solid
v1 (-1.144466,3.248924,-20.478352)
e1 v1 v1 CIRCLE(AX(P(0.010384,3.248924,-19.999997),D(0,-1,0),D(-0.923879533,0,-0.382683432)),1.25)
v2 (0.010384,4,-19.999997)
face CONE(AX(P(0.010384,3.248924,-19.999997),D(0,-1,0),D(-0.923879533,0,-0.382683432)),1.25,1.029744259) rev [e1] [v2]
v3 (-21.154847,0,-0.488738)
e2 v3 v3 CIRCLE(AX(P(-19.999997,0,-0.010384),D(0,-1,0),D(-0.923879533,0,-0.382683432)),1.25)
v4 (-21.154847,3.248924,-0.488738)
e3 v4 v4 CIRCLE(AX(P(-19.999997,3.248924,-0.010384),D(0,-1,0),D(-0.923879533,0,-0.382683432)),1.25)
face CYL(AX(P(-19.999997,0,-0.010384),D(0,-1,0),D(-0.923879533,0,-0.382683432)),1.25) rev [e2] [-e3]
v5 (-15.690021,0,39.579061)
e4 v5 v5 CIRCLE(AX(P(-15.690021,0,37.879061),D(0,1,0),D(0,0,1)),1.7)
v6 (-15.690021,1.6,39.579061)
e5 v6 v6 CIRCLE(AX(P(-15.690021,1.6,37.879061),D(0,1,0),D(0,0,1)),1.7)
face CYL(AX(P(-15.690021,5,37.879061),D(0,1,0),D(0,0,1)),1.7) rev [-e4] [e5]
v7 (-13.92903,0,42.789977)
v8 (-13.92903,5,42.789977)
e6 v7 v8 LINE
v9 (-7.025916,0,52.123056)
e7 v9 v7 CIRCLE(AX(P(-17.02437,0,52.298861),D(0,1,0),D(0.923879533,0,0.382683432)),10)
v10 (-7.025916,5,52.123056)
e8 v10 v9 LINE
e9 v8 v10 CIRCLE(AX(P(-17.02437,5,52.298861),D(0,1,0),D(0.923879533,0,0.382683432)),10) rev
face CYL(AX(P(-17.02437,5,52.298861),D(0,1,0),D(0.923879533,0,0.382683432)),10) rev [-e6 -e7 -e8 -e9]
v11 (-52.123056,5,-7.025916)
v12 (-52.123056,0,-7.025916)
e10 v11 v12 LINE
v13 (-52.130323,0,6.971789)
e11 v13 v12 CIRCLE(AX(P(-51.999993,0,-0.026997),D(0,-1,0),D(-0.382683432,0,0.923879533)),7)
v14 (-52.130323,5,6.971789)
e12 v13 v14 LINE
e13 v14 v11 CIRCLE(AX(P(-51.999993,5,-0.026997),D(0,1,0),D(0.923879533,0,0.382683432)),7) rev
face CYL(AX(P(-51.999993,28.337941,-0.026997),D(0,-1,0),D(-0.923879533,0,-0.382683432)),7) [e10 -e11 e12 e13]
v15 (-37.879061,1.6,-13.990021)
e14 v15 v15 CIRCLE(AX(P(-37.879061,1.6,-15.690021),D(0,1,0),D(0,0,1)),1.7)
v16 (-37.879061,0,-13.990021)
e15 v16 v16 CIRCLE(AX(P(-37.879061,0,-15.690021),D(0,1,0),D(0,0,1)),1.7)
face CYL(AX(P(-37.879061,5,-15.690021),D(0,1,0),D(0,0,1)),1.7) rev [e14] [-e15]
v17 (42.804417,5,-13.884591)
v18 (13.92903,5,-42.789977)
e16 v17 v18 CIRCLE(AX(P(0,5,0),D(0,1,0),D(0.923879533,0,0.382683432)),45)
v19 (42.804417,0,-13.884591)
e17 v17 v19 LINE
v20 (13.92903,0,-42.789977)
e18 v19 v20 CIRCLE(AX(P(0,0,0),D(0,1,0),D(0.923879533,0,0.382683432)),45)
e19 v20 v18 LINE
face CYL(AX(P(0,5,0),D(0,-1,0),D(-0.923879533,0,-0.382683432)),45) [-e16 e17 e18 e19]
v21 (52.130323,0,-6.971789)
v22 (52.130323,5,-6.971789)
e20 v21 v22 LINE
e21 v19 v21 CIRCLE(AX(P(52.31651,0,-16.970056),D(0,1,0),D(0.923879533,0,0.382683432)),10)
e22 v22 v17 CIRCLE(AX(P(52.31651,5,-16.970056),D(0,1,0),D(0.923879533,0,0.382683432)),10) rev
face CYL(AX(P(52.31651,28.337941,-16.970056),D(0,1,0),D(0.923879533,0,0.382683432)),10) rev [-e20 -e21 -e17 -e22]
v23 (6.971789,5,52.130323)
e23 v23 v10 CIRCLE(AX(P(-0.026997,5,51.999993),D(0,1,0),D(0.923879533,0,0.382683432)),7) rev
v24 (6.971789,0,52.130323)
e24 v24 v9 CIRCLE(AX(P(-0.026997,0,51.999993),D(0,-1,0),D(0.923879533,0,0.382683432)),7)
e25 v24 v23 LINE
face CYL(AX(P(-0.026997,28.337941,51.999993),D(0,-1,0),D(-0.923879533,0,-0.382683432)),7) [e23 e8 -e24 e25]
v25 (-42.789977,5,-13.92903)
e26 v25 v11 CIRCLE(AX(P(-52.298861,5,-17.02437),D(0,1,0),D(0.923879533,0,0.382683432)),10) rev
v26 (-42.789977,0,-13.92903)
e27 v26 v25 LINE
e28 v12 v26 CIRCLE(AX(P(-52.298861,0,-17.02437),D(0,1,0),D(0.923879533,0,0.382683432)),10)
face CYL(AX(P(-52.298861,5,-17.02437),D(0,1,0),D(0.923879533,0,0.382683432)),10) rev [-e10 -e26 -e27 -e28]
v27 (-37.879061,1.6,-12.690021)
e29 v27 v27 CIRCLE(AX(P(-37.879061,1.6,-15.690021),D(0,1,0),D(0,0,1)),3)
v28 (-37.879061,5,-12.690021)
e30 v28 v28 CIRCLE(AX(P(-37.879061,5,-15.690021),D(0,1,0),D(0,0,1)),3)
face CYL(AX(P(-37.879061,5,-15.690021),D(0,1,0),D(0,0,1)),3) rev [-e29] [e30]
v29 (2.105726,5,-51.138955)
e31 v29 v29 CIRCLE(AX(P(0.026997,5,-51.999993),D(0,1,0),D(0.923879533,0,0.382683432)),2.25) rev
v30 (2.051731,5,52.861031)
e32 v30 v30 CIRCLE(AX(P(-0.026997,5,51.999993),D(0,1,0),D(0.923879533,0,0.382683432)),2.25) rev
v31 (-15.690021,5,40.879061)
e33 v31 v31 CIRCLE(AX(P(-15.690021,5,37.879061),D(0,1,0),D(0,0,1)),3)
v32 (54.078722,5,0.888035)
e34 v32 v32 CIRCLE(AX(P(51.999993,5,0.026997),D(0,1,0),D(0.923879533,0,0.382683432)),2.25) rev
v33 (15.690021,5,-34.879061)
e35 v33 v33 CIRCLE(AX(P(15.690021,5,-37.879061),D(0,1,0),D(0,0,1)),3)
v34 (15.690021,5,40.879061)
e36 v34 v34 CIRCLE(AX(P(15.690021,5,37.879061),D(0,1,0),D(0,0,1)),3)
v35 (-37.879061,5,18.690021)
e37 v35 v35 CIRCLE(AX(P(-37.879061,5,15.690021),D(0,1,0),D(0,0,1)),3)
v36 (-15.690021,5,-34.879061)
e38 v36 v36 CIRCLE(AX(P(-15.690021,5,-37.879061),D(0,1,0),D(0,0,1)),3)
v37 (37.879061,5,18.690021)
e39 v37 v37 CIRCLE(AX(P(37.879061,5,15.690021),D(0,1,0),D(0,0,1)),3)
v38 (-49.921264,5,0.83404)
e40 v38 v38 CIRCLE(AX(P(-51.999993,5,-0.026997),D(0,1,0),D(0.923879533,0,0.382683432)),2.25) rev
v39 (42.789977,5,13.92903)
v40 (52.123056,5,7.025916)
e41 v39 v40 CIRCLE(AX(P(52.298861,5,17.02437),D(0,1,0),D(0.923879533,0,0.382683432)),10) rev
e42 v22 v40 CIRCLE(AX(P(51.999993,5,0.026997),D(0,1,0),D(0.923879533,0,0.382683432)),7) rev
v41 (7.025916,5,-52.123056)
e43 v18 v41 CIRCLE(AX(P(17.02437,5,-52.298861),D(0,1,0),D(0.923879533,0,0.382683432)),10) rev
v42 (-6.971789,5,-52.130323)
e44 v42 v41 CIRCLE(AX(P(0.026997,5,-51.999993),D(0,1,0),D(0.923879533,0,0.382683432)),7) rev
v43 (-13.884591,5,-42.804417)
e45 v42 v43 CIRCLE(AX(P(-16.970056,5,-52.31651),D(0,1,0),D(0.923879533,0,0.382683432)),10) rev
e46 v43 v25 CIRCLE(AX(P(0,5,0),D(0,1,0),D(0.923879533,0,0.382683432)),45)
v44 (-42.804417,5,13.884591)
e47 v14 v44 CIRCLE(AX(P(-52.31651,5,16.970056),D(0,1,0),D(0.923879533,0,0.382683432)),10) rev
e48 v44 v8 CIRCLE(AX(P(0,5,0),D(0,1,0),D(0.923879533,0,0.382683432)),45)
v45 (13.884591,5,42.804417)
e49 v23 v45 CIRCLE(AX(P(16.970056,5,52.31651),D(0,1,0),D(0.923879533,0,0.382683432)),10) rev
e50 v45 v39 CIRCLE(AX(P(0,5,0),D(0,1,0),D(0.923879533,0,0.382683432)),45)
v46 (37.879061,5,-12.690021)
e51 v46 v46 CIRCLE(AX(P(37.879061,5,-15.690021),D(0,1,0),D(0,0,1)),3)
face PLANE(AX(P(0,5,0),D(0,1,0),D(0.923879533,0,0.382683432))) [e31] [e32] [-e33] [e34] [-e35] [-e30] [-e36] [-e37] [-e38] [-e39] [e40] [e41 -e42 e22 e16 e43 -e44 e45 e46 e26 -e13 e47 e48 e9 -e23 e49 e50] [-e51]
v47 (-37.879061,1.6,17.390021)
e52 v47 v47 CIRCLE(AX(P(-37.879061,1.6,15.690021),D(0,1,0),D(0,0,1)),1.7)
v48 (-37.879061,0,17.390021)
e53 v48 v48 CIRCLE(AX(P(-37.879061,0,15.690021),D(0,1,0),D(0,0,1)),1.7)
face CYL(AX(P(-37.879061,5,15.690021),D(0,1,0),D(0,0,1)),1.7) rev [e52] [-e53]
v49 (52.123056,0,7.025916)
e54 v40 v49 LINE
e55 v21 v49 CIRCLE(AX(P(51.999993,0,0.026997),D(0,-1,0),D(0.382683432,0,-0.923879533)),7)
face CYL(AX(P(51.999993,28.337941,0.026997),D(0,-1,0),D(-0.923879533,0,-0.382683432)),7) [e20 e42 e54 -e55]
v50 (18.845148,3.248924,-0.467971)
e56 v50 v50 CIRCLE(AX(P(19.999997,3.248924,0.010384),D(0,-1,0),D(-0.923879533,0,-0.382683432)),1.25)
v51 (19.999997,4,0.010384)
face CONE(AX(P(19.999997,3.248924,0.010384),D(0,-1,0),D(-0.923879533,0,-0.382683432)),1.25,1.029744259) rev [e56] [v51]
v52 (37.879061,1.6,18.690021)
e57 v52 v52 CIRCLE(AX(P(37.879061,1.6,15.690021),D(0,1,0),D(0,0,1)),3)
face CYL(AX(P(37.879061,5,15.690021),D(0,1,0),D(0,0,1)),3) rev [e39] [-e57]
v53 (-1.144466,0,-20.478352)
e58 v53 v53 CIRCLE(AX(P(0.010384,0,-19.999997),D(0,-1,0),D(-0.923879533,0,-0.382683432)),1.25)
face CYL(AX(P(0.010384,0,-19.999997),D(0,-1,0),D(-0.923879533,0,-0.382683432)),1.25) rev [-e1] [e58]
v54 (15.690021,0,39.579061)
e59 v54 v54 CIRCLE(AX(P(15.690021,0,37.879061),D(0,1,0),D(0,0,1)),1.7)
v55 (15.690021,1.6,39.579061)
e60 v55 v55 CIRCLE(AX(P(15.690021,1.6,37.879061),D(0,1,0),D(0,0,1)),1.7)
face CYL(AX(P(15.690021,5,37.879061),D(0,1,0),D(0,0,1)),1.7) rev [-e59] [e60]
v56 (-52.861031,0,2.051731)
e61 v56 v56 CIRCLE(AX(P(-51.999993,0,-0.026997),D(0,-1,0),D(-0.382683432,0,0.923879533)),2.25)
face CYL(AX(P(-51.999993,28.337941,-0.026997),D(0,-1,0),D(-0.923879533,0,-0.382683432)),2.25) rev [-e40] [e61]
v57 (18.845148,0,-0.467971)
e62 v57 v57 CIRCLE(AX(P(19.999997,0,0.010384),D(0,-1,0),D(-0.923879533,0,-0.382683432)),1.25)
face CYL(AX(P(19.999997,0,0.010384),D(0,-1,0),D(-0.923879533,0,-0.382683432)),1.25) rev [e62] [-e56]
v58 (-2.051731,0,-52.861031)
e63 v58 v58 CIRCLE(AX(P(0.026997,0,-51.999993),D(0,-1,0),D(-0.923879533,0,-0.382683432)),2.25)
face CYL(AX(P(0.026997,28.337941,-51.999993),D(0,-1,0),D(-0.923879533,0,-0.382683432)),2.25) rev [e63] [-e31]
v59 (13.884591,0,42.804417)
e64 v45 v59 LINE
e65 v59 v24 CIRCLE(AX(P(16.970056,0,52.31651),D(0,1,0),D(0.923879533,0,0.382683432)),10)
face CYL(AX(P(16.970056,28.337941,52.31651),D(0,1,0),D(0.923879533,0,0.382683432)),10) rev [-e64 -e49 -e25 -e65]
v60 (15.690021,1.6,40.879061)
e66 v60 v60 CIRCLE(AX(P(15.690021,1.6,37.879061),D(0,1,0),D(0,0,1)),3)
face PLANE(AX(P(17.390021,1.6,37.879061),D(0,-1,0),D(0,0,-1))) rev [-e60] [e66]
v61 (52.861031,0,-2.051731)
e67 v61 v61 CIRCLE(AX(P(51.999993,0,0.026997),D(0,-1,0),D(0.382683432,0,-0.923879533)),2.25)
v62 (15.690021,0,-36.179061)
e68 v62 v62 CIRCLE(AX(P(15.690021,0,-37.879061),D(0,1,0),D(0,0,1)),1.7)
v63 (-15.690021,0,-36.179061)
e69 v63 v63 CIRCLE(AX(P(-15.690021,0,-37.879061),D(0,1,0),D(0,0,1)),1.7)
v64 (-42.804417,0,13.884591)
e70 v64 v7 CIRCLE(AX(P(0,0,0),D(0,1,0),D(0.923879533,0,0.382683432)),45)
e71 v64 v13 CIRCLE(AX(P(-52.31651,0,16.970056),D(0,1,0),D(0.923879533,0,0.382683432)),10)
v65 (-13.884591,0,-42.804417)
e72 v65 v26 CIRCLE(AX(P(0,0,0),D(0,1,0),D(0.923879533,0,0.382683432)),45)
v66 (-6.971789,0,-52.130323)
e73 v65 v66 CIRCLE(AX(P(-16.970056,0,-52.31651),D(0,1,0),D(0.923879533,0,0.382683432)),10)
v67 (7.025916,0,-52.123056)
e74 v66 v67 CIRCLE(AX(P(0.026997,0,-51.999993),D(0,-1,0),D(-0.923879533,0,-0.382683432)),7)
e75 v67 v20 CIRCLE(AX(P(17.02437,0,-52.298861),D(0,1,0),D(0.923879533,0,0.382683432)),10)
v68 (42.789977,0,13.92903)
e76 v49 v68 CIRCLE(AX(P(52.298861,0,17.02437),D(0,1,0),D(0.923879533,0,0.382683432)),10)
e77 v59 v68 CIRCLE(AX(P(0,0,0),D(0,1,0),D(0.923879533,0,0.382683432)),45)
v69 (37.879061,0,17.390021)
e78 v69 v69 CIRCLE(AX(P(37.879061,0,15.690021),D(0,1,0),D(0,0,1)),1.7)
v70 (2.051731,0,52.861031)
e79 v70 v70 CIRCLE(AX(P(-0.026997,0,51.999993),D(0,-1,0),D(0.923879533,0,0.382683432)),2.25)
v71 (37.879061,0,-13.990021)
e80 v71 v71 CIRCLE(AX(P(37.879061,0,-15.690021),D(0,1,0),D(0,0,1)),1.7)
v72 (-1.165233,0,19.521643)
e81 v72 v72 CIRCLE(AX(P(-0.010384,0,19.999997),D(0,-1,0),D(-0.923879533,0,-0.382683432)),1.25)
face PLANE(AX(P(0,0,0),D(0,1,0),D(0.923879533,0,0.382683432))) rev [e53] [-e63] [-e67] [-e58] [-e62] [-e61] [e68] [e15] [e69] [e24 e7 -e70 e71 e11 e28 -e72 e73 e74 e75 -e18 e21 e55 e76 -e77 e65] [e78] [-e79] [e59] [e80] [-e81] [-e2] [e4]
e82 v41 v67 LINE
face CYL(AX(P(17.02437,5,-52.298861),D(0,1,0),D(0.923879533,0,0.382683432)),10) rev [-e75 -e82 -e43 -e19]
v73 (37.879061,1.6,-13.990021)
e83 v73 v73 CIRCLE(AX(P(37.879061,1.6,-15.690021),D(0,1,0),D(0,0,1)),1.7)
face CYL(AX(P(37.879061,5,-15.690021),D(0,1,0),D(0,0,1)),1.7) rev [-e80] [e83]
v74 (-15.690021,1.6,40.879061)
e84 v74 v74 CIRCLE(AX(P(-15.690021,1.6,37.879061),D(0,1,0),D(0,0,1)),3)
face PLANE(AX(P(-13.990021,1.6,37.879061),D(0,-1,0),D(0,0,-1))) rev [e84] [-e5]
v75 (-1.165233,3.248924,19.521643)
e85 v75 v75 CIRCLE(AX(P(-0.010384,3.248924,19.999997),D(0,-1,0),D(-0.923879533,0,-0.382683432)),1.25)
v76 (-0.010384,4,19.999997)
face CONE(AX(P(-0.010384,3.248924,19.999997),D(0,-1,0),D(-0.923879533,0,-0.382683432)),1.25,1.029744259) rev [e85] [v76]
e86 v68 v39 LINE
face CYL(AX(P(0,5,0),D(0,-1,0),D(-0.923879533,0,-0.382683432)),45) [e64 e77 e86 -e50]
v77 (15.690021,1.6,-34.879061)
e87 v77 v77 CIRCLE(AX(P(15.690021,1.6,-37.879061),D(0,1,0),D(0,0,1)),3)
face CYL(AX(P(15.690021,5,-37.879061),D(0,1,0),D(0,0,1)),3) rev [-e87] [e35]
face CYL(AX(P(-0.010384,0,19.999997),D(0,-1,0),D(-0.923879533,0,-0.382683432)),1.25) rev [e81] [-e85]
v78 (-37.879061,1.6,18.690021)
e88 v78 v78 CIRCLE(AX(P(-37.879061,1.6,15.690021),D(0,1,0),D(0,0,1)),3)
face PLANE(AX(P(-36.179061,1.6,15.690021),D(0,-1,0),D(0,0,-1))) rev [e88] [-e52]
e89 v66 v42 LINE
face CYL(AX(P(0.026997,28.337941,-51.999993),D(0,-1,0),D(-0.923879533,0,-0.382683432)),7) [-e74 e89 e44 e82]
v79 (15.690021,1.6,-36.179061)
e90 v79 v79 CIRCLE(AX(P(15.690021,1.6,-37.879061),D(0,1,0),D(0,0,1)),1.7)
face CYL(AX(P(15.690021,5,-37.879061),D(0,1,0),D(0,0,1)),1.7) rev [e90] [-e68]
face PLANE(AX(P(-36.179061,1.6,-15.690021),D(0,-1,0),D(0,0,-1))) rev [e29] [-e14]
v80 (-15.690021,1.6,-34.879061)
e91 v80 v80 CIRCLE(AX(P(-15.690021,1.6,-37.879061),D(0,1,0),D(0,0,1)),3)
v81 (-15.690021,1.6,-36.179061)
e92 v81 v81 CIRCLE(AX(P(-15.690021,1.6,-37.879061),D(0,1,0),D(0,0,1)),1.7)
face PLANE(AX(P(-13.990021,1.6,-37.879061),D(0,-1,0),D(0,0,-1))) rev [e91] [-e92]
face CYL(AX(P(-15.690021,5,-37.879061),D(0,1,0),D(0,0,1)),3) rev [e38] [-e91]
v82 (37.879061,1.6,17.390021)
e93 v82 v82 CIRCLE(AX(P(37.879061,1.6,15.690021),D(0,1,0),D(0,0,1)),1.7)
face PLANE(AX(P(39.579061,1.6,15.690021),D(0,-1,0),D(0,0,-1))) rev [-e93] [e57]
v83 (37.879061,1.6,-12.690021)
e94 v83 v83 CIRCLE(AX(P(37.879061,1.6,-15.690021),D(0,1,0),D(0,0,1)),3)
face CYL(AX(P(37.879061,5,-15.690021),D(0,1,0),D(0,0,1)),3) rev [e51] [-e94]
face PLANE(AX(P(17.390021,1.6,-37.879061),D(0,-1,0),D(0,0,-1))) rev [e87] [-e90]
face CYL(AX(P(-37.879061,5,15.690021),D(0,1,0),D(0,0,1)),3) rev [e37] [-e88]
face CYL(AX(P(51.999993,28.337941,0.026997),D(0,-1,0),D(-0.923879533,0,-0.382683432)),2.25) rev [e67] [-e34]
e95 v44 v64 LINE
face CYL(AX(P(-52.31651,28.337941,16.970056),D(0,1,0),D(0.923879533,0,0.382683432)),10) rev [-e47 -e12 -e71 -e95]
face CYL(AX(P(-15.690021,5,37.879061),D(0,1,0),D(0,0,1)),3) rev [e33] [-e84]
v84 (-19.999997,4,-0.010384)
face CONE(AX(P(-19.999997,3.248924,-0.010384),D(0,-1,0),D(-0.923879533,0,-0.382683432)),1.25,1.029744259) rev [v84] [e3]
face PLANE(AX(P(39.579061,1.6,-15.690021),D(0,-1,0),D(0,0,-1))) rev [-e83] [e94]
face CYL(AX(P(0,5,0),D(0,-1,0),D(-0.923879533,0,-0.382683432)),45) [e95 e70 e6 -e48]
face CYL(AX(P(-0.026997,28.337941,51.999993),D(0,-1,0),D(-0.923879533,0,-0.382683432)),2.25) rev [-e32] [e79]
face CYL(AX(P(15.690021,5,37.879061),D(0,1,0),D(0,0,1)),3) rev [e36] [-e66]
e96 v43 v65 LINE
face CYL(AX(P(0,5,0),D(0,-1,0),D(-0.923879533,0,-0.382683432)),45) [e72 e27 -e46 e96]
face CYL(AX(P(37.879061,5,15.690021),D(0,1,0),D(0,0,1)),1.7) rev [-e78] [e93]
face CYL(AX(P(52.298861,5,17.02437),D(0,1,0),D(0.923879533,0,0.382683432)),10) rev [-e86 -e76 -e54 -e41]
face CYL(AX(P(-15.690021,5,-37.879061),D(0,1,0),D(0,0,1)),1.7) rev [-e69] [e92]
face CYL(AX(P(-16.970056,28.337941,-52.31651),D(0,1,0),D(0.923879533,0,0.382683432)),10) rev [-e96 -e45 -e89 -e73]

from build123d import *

# Parameters (mm, degrees)
SKETCH1_R                                           = 45
SKETCH1_R_2                                         = 1.5
BOSS_EXTRUDE2_DEPTH                                 = 5
SKETCH9_R                                           = 3.937
BOSS_EXTRUDE7_DEPTH                                 = 4
BOSS_EXTRUDE8_DEPTH                                 = 5
FILLET1_R                                           = 10
SKETCH17_R                                          = 8.317724374
BOSS_EXTRUDE9_DEPTH                                 = 10
CIRPATTERN1_COUNT                                   = 4
FILLET1_OF_CIRPATTERN1_R                            = 10
CUT_EXTRUDE10_DEPTH                                 = 80.287191874
CUT_EXTRUDE10_DEPTH_BACK                            = 80.287191874
SKETCH18_W                                          = 16.635448748
SKETCH18_H                                          = 10
SKETCH18_W_2                                        = 61.874
SKETCH18_H_2                                        = 4
M3_TAPPED_HOLE1_D                                   = 2.5
M3_TAPPED_HOLE1_DEPTH                               = 3.248924226
M3_TAPPED_HOLE1_TIP                                 = 0.751075774
BODY_MOVE_COPY1_OUTLINE_R                           = 2.25
BODY_MOVE_COPY1_OUTLINE_R_2                         = 1.5
BODY_MOVE_COPY1_OUTLINE_R_3                         = 1.25
BODY_MOVE_COPY1_DEPTH                               = 5
BODY_MOVE_COPY1_6_OUTLINE_R                         = 1.5
BODY_MOVE_COPY1_6_OUTLINE_R_2                       = 2.25
BODY_MOVE_COPY1_6_DEPTH                             = 5
BODY_MOVE_COPY1_7_OUTLINE_R                         = 1.25
BODY_MOVE_COPY1_7_DEPTH                             = 0.5281
CBORE_FOR_M3_HEX_SOCKET_HEAD_CAP_SCREW6_D           = 3.4
CBORE_FOR_M3_HEX_SOCKET_HEAD_CAP_SCREW6_CBORE_D     = 6
CBORE_FOR_M3_HEX_SOCKET_HEAD_CAP_SCREW6_CBORE_DEPTH = 3.4


# Read off the part's stored shape, not the designer's step: Body-Move/Copy1
with BuildPart() as part:
    # Sketch1 → Boss-Extrude2 (new body)
    with BuildSketch(Plane(origin=(0, 0, 0), x_dir=(1, 0, 0), z_dir=(0, 1, 0))):
        with Locations(Location((0, 0, 0), (0, 0, 270))):
            Circle(SKETCH1_R)
        with Locations(Location((0, 41, 0), (0, 0, 270))):
            Circle(SKETCH1_R_2, mode=Mode.SUBTRACT)
        with Locations(Location((28.991378029, 28.991378029, 0), (0, 0, 270))):
            Circle(SKETCH1_R_2, mode=Mode.SUBTRACT)
        with Locations(Location((41, 0, 0), (0, 0, 270))):
            Circle(SKETCH1_R_2, mode=Mode.SUBTRACT)
        with Locations(Location((28.991378029, -28.991378029, 0), (0, 0, 270))):
            Circle(SKETCH1_R_2, mode=Mode.SUBTRACT)
        with Locations(Location((0, -41, 0), (0, 0, 270))):
            Circle(SKETCH1_R_2, mode=Mode.SUBTRACT)
        with Locations(Location((-28.991378029, -28.991378029, 0), (0, 0, 270))):
            Circle(SKETCH1_R_2, mode=Mode.SUBTRACT)
        with Locations(Location((-41, 0, 0), (0, 0, 270))):
            Circle(SKETCH1_R_2, mode=Mode.SUBTRACT)
        with Locations(Location((-28.991378029, 28.991378029, 0), (0, 0, 270))):
            Circle(SKETCH1_R_2, mode=Mode.SUBTRACT)
    extrude(amount=BOSS_EXTRUDE2_DEPTH)

    # Sketch9 → Boss-Extrude7 (add)
    with BuildSketch(Plane.XZ):
        with Locations(Location((27, 0, 0), (0, 0, 90))):
            Circle(SKETCH9_R)
        with Locations(Location((0, -27, 0), (0, 0, 90))):
            Circle(SKETCH9_R)
        with Locations(Location((-27, 0, 0), (0, 0, 90))):
            Circle(SKETCH9_R)
        with Locations(Location((0, 27, 0), (0, 0, 90))):
            Circle(SKETCH9_R)
    extrude(amount=BOSS_EXTRUDE7_DEPTH)

    # Sketch16 → Boss-Extrude8 (add)
    with BuildSketch(Plane.XZ):
        with BuildLine():
            ThreePointArc((45.376634658, -26.343140039), (41.586295626, -22.556734731), (41.583514038, -17.199167429))
            ThreePointArc((41.583514038, -17.199167429), (40.114970744, -20.390907832), (38.401897955, -23.458351039))
            Line((38.401897955, -23.458351039), (45.376634658, -26.343140039))
        make_face()
        with BuildLine():
            Line((50.727486729, -13.406046775), (43.752750026, -10.521257775))
            ThreePointArc((43.752750026, -10.521257775), (42.798576033, -13.902585715), (41.583514038, -17.199167429))
            ThreePointArc((41.583514038, -17.199167429), (45.36991937, -13.408828339), (50.727486729, -13.406046775))
        make_face()
        with BuildLine():
            Line((45.972884991, -19.014635038), (41.583514062, -17.199167371))
            ThreePointArc((41.583514062, -17.199167371), (41.586295614, -22.556734702), (45.376634658, -26.343140039))
            Line((45.376634658, -26.343140039), (47.192102325, -21.95376911))
            ThreePointArc((47.192102325, -21.95376911), (45.973779061, -20.736710252), (45.972884991, -19.014635038))
        make_face()
        with BuildLine():
            ThreePointArc((50.727486729, -13.406046775), (45.369919398, -13.408828327), (41.583514062, -17.199167371))
            Line((41.583514062, -17.199167371), (45.972884991, -19.014635038))
            ThreePointArc((45.972884991, -19.014635038), (47.189943849, -17.796311774), (48.912019062, -17.795417704))
            Line((48.912019062, -17.795417704), (50.727486729, -13.406046775))
        make_face()
        with BuildLine():
            ThreePointArc((55.052060694, -19.874593407), (53.871338237, -15.984091013), (50.727486729, -13.406046775))
            Line((50.727486729, -13.406046775), (48.912019062, -17.795417704))
            ThreePointArc((48.912019062, -17.795417704), (49.922542761, -18.62407478), (50.302060694, -19.874593407))
            ThreePointArc((50.302060694, -19.874593407), (49.30257932, -21.745075474), (47.192102325, -21.95376911))
            Line((47.192102325, -21.95376911), (45.376634658, -26.343140039))
            ThreePointArc((45.376634658, -26.343140039), (51.942563088, -25.69387095), (55.052060694, -19.874593407))
        make_face()
    boss_extrude8 = extrude(amount=-BOSS_EXTRUDE8_DEPTH)

    # Fillet1
    fillet1_edges = [part.edges().sort_by_distance(p)[0] for p in [
        (43.752750026, 2.5, -10.521257775),
        (38.401897955, 2.5, -23.458351039),
    ]]
    fillet(fillet1_edges, radius=FILLET1_R)

    # Sketch17 → Boss-Extrude9 (add)
    with BuildSketch(Plane(origin=(0, 5, 0), x_dir=(1, 0, 0), z_dir=(0, 1, 0))):
        with Locations(Location((0, 0, 0), (0, 0, 270))):
            Circle(SKETCH17_R)
    extrude(amount=BOSS_EXTRUDE9_DEPTH)

    # CirPattern1: Boss-Extrude8 ×4 about axis
    cirpattern1_axis = Axis((0, 0, 0), (0, 1, 0))
    for i in range(1, CIRPATTERN1_COUNT):
        add(boss_extrude8.rotate(cirpattern1_axis, i * 360 / CIRPATTERN1_COUNT))

    # Fillet1 of CirPattern1
    fillet1_of_cirpattern1_edges = [part.edges().sort_by_distance(p)[0] for p in [
        (-10.521257775, 2.5, -43.752750026),
        (-23.458351039, 2.5, -38.401897955),
        (-43.752750026, 2.5, 10.521257775),
        (-38.401897955, 2.5, 23.458351039),
        (10.521257775, 2.5, 43.752750026),
        (23.458351039, 2.5, 38.401897955),
    ]]
    fillet(fillet1_of_cirpattern1_edges, radius=FILLET1_OF_CIRPATTERN1_R)

    # Sketch18 → Cut-Extrude10 (cut, two sides: drawn at the far end of the back side and taken through both)
    with BuildSketch(Plane.XY.offset(-CUT_EXTRUDE10_DEPTH_BACK)):
        with Locations((0, 10)):
            Rectangle(SKETCH18_W, SKETCH18_H)
        with Locations((0, -2)):
            Rectangle(SKETCH18_W_2, SKETCH18_H_2)
    extrude(amount=CUT_EXTRUDE10_DEPTH + CUT_EXTRUDE10_DEPTH_BACK, mode=Mode.SUBTRACT)

    # M3 Tapped Hole1
    with Locations(Plane(origin=(0, 0, 0), x_dir=(-1, 0, 0), z_dir=(0, -1, 0))):
        with Locations((7.644074387, 18.481561805), (18.481561805, -7.644074387), (-7.644074387, -18.481561805), (-18.481561805, 7.644074387)):
            Hole(M3_TAPPED_HOLE1_D / 2, depth=M3_TAPPED_HOLE1_DEPTH)
            with Locations((0, 0, -(M3_TAPPED_HOLE1_DEPTH + M3_TAPPED_HOLE1_TIP / 2))):  # 118° drill point
                Cone(0, M3_TAPPED_HOLE1_D / 2, M3_TAPPED_HOLE1_TIP, mode=Mode.SUBTRACT)

    # Body-Move/Copy1 outline → Body-Move/Copy1 (add)
    # profile 1 of 16: a face of its own
    with BuildSketch(Plane(origin=(0, 0, 0), x_dir=(1, 0, 0), z_dir=(0, 1, 0))):
        with BuildLine():
            ThreePointArc((7.025915617, 52.12305613), (0.030631725, 58.999992048), (-6.971789154, 52.130323484))
            ThreePointArc((-6.971789154, 52.130323484), (-7.560114348, 48.93228132), (-9.143409124, 46.092073957))
            ThreePointArc((-9.143409124, 46.092073957), (-6.4153899, 45.062258298), (-3.50626939, 44.863192875))
            ThreePointArc((-3.50626939, 44.863192875), (5.313477338, 44.685198428), (13.929030112, 42.789976866))
            ThreePointArc((13.929030112, 42.789976866), (8.984565659, 46.352303293), (7.025915617, 52.12305613))
        make_face()
        with Locations((0.026997453, 51.999992992)):
            Circle(BODY_MOVE_COPY1_OUTLINE_R, mode=Mode.SUBTRACT)
    # profile 2 of 16: a face of its own
    with BuildSketch(Plane(origin=(0, 0, 0), x_dir=(1, 0, 0), z_dir=(0, 1, 0))):
        with BuildLine():
            ThreePointArc((-44.863192875, -3.50626939), (-44.685198428, 5.313477338), (-42.789976866, 13.929030112))
            ThreePointArc((-42.789976866, 13.929030112), (-46.352303293, 8.984565659), (-52.12305613, 7.025915617))
            ThreePointArc((-52.12305613, 7.025915617), (-58.999992048, 0.030631725), (-52.130323484, -6.971789154))
            ThreePointArc((-52.130323484, -6.971789154), (-48.93228132, -7.560114348), (-46.092073957, -9.143409124))
            ThreePointArc((-46.092073957, -9.143409124), (-45.062258298, -6.4153899), (-44.863192875, -3.50626939))
        make_face()
        with Locations((-51.999992992, 0.026997453)):
            Circle(BODY_MOVE_COPY1_OUTLINE_R, mode=Mode.SUBTRACT)
    # profile 3 of 16: a face of its own
    with BuildSketch(Plane(origin=(0, 0, 0), x_dir=(1, 0, 0), z_dir=(0, 1, 0))):
        with BuildLine():
            ThreePointArc((52.130323484, 6.971789154), (48.93228132, 7.560114348), (46.092073957, 9.143409124))
            ThreePointArc((46.092073957, 9.143409124), (45.062258298, 6.4153899), (44.863192875, 3.50626939))
            ThreePointArc((44.863192875, 3.50626939), (44.685198428, -5.313477338), (42.789976866, -13.929030112))
            ThreePointArc((42.789976866, -13.929030112), (46.352303293, -8.984565659), (52.12305613, -7.025915617))
            ThreePointArc((52.12305613, -7.025915617), (58.999992048, -0.030631725), (52.130323484, 6.971789154))
        make_face()
        with Locations((51.999992992, -0.026997453)):
            Circle(BODY_MOVE_COPY1_OUTLINE_R, mode=Mode.SUBTRACT)
    # profile 4 of 16: a face of its own
    with BuildSketch(Plane(origin=(0, 0, 0), x_dir=(1, 0, 0), z_dir=(0, 1, 0))):
        with BuildLine():
            ThreePointArc((3.50626939, -44.863192875), (-5.313477338, -44.685198428), (-13.929030112, -42.789976866))
            ThreePointArc((-13.929030112, -42.789976866), (-8.984565659, -46.352303293), (-7.025915617, -52.12305613))
            ThreePointArc((-7.025915617, -52.12305613), (-0.030631725, -58.999992048), (6.971789154, -52.130323484))
            ThreePointArc((6.971789154, -52.130323484), (7.560114348, -48.93228132), (9.143409124, -46.092073957))
            ThreePointArc((9.143409124, -46.092073957), (6.4153899, -45.062258298), (3.50626939, -44.863192875))
        make_face()
        with Locations((-0.026997453, -51.999992992)):
            Circle(BODY_MOVE_COPY1_OUTLINE_R, mode=Mode.SUBTRACT)
    # profile 5 of 16: a face of its own
    with BuildSketch(Plane(origin=(0, 0, 0), x_dir=(1, 0, 0), z_dir=(0, 1, 0))):
        with Locations((0, 41)):
            Circle(BODY_MOVE_COPY1_OUTLINE_R_2)
    # profile 6 of 16: a face of its own
    with BuildSketch(Plane(origin=(0, 0, 0), x_dir=(1, 0, 0), z_dir=(0, 1, 0))):
        with Locations((28.991378029, 28.991378029)):
            Circle(BODY_MOVE_COPY1_OUTLINE_R_2)
    # profile 7 of 16: a face of its own
    with BuildSketch(Plane(origin=(0, 0, 0), x_dir=(1, 0, 0), z_dir=(0, 1, 0))):
        with Locations((41, 0)):
            Circle(BODY_MOVE_COPY1_OUTLINE_R_2)
    # profile 8 of 16: a face of its own
    with BuildSketch(Plane(origin=(0, 0, 0), x_dir=(1, 0, 0), z_dir=(0, 1, 0))):
        with Locations((28.991378029, -28.991378029)):
            Circle(BODY_MOVE_COPY1_OUTLINE_R_2)
    # profile 9 of 16: a face of its own
    with BuildSketch(Plane(origin=(0, 0, 0), x_dir=(1, 0, 0), z_dir=(0, 1, 0))):
        with Locations((0, -41)):
            Circle(BODY_MOVE_COPY1_OUTLINE_R_2)
    # profile 10 of 16: a face of its own
    with BuildSketch(Plane(origin=(0, 0, 0), x_dir=(1, 0, 0), z_dir=(0, 1, 0))):
        with Locations((-28.991378029, -28.991378029)):
            Circle(BODY_MOVE_COPY1_OUTLINE_R_2)
    # profile 11 of 16: a face of its own
    with BuildSketch(Plane(origin=(0, 0, 0), x_dir=(1, 0, 0), z_dir=(0, 1, 0))):
        with Locations((-41, 0)):
            Circle(BODY_MOVE_COPY1_OUTLINE_R_2)
    # profile 12 of 16: a face of its own
    with BuildSketch(Plane(origin=(0, 0, 0), x_dir=(1, 0, 0), z_dir=(0, 1, 0))):
        with Locations((-28.991378029, 28.991378029)):
            Circle(BODY_MOVE_COPY1_OUTLINE_R_2)
    # profile 13 of 16: a face of its own
    with BuildSketch(Plane(origin=(0, 0, 0), x_dir=(1, 0, 0), z_dir=(0, 1, 0))):
        with Locations((18.481561805, 7.644074387)):
            Circle(BODY_MOVE_COPY1_OUTLINE_R_3)
    # profile 14 of 16: a face of its own
    with BuildSketch(Plane(origin=(0, 0, 0), x_dir=(1, 0, 0), z_dir=(0, 1, 0))):
        with Locations((7.644074387, -18.481561805)):
            Circle(BODY_MOVE_COPY1_OUTLINE_R_3)
    # profile 15 of 16: a face of its own
    with BuildSketch(Plane(origin=(0, 0, 0), x_dir=(1, 0, 0), z_dir=(0, 1, 0))):
        with Locations((-18.481561805, -7.644074387)):
            Circle(BODY_MOVE_COPY1_OUTLINE_R_3)
    # profile 16 of 16: a face of its own
    with BuildSketch(Plane(origin=(0, 0, 0), x_dir=(1, 0, 0), z_dir=(0, 1, 0))):
        with Locations((-7.644074387, 18.481561805)):
            Circle(BODY_MOVE_COPY1_OUTLINE_R_3)
    extrude(amount=BODY_MOVE_COPY1_DEPTH)

    # Body-Move_Copy1 2 outline → Body-Move_Copy1 2 (revolve)
    with BuildSketch(Plane(origin=(18.481561805, 0, -7.644074387), x_dir=(1, 0, 0), z_dir=(0, 0, 1))):
        Polygon((1.25, 3.248924226), (0, 4), (0, 0), (1.25, 0), align=None)
    revolve(axis=Axis((18.481561805, 0, -7.644074387), (0, 1, 0)))

    # Body-Move_Copy1 3 outline → Body-Move_Copy1 3 (revolve)
    with BuildSketch(Plane(origin=(7.644074387, 0, 18.481561805), x_dir=(1, 0, 0), z_dir=(0, 0, 1))):
        Polygon((1.25, 3.248924226), (0, 4), (0, 0), (1.25, 0), align=None)
    revolve(axis=Axis((7.644074387, 0, 18.481561805), (0, 1, 0)))

    # Body-Move_Copy1 4 outline → Body-Move_Copy1 4 (revolve)
    with BuildSketch(Plane(origin=(-18.481561805, 0, 7.644074387), x_dir=(1, 0, 0), z_dir=(0, 0, 1))):
        Polygon((1.25, 3.248924226), (0, 4), (0, 0), (1.25, 0), align=None)
    revolve(axis=Axis((-18.481561805, 0, 7.644074387), (0, 1, 0)))

    # Body-Move_Copy1 5 outline → Body-Move_Copy1 5 (revolve)
    with BuildSketch(Plane(origin=(-7.644074387, 0, -18.481561805), x_dir=(1, 0, 0), z_dir=(0, 0, 1))):
        Polygon((1.25, 3.248924226), (0, 4), (0, 0), (1.25, 0), align=None)
    revolve(axis=Axis((-7.644074387, 0, -18.481561805), (0, 1, 0)))

    # Body-Move_Copy1 6 outline → Body-Move_Copy1 6 (cut)
    # profile 1 of 12: a face of its own
    with BuildSketch(Plane(origin=(0, 0, 0), x_dir=(1, 0, 0), z_dir=(0, 1, 0))):
        with Locations((-37.879060833, 15.690020727)):
            Circle(BODY_MOVE_COPY1_6_OUTLINE_R)
    # profile 2 of 12: a face of its own
    with BuildSketch(Plane(origin=(0, 0, 0), x_dir=(1, 0, 0), z_dir=(0, 1, 0))):
        with Locations((-15.690020727, 37.879060833)):
            Circle(BODY_MOVE_COPY1_6_OUTLINE_R)
    # profile 3 of 12: a face of its own
    with BuildSketch(Plane(origin=(0, 0, 0), x_dir=(1, 0, 0), z_dir=(0, 1, 0))):
        with Locations((15.690020727, 37.879060833)):
            Circle(BODY_MOVE_COPY1_6_OUTLINE_R)
    # profile 4 of 12: a face of its own
    with BuildSketch(Plane(origin=(0, 0, 0), x_dir=(1, 0, 0), z_dir=(0, 1, 0))):
        with Locations((37.879060833, 15.690020727)):
            Circle(BODY_MOVE_COPY1_6_OUTLINE_R)
    # profile 5 of 12: a face of its own
    with BuildSketch(Plane(origin=(0, 0, 0), x_dir=(1, 0, 0), z_dir=(0, 1, 0))):
        with Locations((37.879060833, -15.690020727)):
            Circle(BODY_MOVE_COPY1_6_OUTLINE_R)
    # profile 6 of 12: a face of its own
    with BuildSketch(Plane(origin=(0, 0, 0), x_dir=(1, 0, 0), z_dir=(0, 1, 0))):
        with Locations((15.690020727, -37.879060833)):
            Circle(BODY_MOVE_COPY1_6_OUTLINE_R)
    # profile 7 of 12: a face of its own
    with BuildSketch(Plane(origin=(0, 0, 0), x_dir=(1, 0, 0), z_dir=(0, 1, 0))):
        with Locations((-15.690020727, -37.879060833)):
            Circle(BODY_MOVE_COPY1_6_OUTLINE_R)
    # profile 8 of 12: a face of its own
    with BuildSketch(Plane(origin=(0, 0, 0), x_dir=(1, 0, 0), z_dir=(0, 1, 0))):
        with Locations((-37.879060833, -15.690020727)):
            Circle(BODY_MOVE_COPY1_6_OUTLINE_R)
    # profile 9 of 12: a face of its own
    with BuildSketch(Plane(origin=(0, 0, 0), x_dir=(1, 0, 0), z_dir=(0, 1, 0))):
        with BuildLine():
            ThreePointArc((-13.884591055, 42.804417193), (-11.271747657, 44.098889502), (-9.143409124, 46.092073957))
            ThreePointArc((-9.143409124, 46.092073957), (-11.69098616, 48.112829129), (-13.45553039, 50.844126234))
            ThreePointArc((-13.45553039, 50.844126234), (-22.550019443, 54.520607326), (-26.390504425, 45.494150687))
            ThreePointArc((-26.390504425, 45.494150687), (-25.998004135, 39.412716496), (-29.208230785, 34.232721984))
            ThreePointArc((-29.208230785, 34.232721984), (-21.968530065, 39.273192979), (-13.884591055, 42.804417193))
        make_face()
        with Locations((-19.874593407, 48.052060694)):
            Circle(BODY_MOVE_COPY1_6_OUTLINE_R_2, mode=Mode.SUBTRACT)
    # profile 10 of 12: a face of its own
    with BuildSketch(Plane(origin=(0, 0, 0), x_dir=(1, 0, 0), z_dir=(0, 1, 0))):
        with BuildLine():
            ThreePointArc((45.494150687, 26.390504425), (39.412716496, 25.998004135), (34.232721984, 29.208230785))
            ThreePointArc((34.232721984, 29.208230785), (39.273192979, 21.968530065), (42.804417193, 13.884591055))
            ThreePointArc((42.804417193, 13.884591055), (44.098889502, 11.271747657), (46.092073957, 9.143409124))
            ThreePointArc((46.092073957, 9.143409124), (48.112829129, 11.69098616), (50.844126234, 13.45553039))
            ThreePointArc((50.844126234, 13.45553039), (54.520607326, 22.550019443), (45.494150687, 26.390504425))
        make_face()
        with Locations((48.052060694, 19.874593407)):
            Circle(BODY_MOVE_COPY1_6_OUTLINE_R_2, mode=Mode.SUBTRACT)
    # profile 11 of 12: a face of its own
    with BuildSketch(Plane(origin=(0, 0, 0), x_dir=(1, 0, 0), z_dir=(0, 1, 0))):
        with BuildLine():
            ThreePointArc((-42.804417193, -13.884591055), (-44.098889502, -11.271747657), (-46.092073957, -9.143409124))
            ThreePointArc((-46.092073957, -9.143409124), (-48.112829129, -11.69098616), (-50.844126234, -13.45553039))
            ThreePointArc((-50.844126234, -13.45553039), (-54.520607326, -22.550019443), (-45.494150687, -26.390504425))
            ThreePointArc((-45.494150687, -26.390504425), (-39.412716496, -25.998004135), (-34.232721984, -29.208230785))
            ThreePointArc((-34.232721984, -29.208230785), (-39.273192979, -21.968530065), (-42.804417193, -13.884591055))
        make_face()
        with Locations((-48.052060694, -19.874593407)):
            Circle(BODY_MOVE_COPY1_6_OUTLINE_R_2, mode=Mode.SUBTRACT)
    # profile 12 of 12: a face of its own
    with BuildSketch(Plane(origin=(0, 0, 0), x_dir=(1, 0, 0), z_dir=(0, 1, 0))):
        with BuildLine():
            ThreePointArc((26.390504425, -45.494150687), (25.998004135, -39.412716496), (29.208230785, -34.232721984))
            ThreePointArc((29.208230785, -34.232721984), (21.968530065, -39.273192979), (13.884591055, -42.804417193))
            ThreePointArc((13.884591055, -42.804417193), (11.271747657, -44.098889502), (9.143409124, -46.092073957))
            ThreePointArc((9.143409124, -46.092073957), (11.69098616, -48.112829129), (13.45553039, -50.844126234))
            ThreePointArc((13.45553039, -50.844126234), (22.550019443, -54.520607326), (26.390504425, -45.494150687))
        make_face()
        with Locations((19.874593407, -48.052060694)):
            Circle(BODY_MOVE_COPY1_6_OUTLINE_R_2, mode=Mode.SUBTRACT)
    extrude(amount=BODY_MOVE_COPY1_6_DEPTH, mode=Mode.SUBTRACT)

    # Body-Move_Copy1 7 outline → Body-Move_Copy1 7 (cut)
    with BuildSketch(Plane(origin=(0, 0, 0), x_dir=(1, 0, 0), z_dir=(0, 1, 0))):
        with Locations((0.010383636, 19.999997305)):
            Circle(BODY_MOVE_COPY1_7_OUTLINE_R)
        with Locations((19.999997305, -0.010383636)):
            Circle(BODY_MOVE_COPY1_7_OUTLINE_R)
        with Locations((-0.010383636, -19.999997305)):
            Circle(BODY_MOVE_COPY1_7_OUTLINE_R)
        with Locations((-19.999997305, 0.010383636)):
            Circle(BODY_MOVE_COPY1_7_OUTLINE_R)
    extrude(amount=BODY_MOVE_COPY1_7_DEPTH, mode=Mode.SUBTRACT)

    # Body-Move_Copy1 8 outline → Body-Move_Copy1 8 (revolve, cut)
    with BuildSketch(Plane(origin=(0.010383636, 0, -19.999997305), x_dir=(1, 0, 0), z_dir=(0, 0, 1))):
        Polygon((1.25, 3.248924226), (0, 4), (0, 0), (1.25, 0), align=None)
    revolve(axis=Axis((0.010383636, 0, -19.999997305), (0, 1, 0)), mode=Mode.SUBTRACT)

    # Body-Move_Copy1 9 outline → Body-Move_Copy1 9 (revolve, cut)
    with BuildSketch(Plane(origin=(19.999997305, 0, 0.010383636), x_dir=(1, 0, 0), z_dir=(0, 0, 1))):
        Polygon((1.25, 3.248924226), (0, 4), (0, 0), (1.25, 0), align=None)
    revolve(axis=Axis((19.999997305, 0, 0.010383636), (0, 1, 0)), mode=Mode.SUBTRACT)

    # Body-Move_Copy1 10 outline → Body-Move_Copy1 10 (revolve, cut)
    with BuildSketch(Plane(origin=(-0.010383636, 0, 19.999997305), x_dir=(1, 0, 0), z_dir=(0, 0, 1))):
        Polygon((1.25, 3.248924226), (0, 4), (0, 0), (1.25, 0), align=None)
    revolve(axis=Axis((-0.010383636, 0, 19.999997305), (0, 1, 0)), mode=Mode.SUBTRACT)

    # Body-Move_Copy1 11 outline → Body-Move_Copy1 11 (revolve, cut)
    with BuildSketch(Plane(origin=(-19.999997305, 0, -0.010383636), x_dir=(1, 0, 0), z_dir=(0, 0, 1))):
        Polygon((1.25, 3.248924226), (0, 4), (0, 0), (1.25, 0), align=None)
    revolve(axis=Axis((-19.999997305, 0, -0.010383636), (0, 1, 0)), mode=Mode.SUBTRACT)

    # CBORE for M3 Hex Socket Head Cap Screw6 (through all)
    with Locations(Plane(origin=(0, 5, 0), x_dir=(1, 0, 0), z_dir=(0, 1, 0))):
        with Locations((-37.879060833, -15.690020727), (-37.879060833, 15.690020727), (-15.690020727, 37.879060833), (15.690020727, 37.879060833), (37.879060833, 15.690020727), (37.879060833, -15.690020727), (15.690020727, -37.879060833), (-15.690020727, -37.879060833)):
            CounterBoreHole(CBORE_FOR_M3_HEX_SOCKET_HEAD_CAP_SCREW6_D / 2, CBORE_FOR_M3_HEX_SOCKET_HEAD_CAP_SCREW6_CBORE_D / 2, CBORE_FOR_M3_HEX_SOCKET_HEAD_CAP_SCREW6_CBORE_DEPTH)


solid = part.part
